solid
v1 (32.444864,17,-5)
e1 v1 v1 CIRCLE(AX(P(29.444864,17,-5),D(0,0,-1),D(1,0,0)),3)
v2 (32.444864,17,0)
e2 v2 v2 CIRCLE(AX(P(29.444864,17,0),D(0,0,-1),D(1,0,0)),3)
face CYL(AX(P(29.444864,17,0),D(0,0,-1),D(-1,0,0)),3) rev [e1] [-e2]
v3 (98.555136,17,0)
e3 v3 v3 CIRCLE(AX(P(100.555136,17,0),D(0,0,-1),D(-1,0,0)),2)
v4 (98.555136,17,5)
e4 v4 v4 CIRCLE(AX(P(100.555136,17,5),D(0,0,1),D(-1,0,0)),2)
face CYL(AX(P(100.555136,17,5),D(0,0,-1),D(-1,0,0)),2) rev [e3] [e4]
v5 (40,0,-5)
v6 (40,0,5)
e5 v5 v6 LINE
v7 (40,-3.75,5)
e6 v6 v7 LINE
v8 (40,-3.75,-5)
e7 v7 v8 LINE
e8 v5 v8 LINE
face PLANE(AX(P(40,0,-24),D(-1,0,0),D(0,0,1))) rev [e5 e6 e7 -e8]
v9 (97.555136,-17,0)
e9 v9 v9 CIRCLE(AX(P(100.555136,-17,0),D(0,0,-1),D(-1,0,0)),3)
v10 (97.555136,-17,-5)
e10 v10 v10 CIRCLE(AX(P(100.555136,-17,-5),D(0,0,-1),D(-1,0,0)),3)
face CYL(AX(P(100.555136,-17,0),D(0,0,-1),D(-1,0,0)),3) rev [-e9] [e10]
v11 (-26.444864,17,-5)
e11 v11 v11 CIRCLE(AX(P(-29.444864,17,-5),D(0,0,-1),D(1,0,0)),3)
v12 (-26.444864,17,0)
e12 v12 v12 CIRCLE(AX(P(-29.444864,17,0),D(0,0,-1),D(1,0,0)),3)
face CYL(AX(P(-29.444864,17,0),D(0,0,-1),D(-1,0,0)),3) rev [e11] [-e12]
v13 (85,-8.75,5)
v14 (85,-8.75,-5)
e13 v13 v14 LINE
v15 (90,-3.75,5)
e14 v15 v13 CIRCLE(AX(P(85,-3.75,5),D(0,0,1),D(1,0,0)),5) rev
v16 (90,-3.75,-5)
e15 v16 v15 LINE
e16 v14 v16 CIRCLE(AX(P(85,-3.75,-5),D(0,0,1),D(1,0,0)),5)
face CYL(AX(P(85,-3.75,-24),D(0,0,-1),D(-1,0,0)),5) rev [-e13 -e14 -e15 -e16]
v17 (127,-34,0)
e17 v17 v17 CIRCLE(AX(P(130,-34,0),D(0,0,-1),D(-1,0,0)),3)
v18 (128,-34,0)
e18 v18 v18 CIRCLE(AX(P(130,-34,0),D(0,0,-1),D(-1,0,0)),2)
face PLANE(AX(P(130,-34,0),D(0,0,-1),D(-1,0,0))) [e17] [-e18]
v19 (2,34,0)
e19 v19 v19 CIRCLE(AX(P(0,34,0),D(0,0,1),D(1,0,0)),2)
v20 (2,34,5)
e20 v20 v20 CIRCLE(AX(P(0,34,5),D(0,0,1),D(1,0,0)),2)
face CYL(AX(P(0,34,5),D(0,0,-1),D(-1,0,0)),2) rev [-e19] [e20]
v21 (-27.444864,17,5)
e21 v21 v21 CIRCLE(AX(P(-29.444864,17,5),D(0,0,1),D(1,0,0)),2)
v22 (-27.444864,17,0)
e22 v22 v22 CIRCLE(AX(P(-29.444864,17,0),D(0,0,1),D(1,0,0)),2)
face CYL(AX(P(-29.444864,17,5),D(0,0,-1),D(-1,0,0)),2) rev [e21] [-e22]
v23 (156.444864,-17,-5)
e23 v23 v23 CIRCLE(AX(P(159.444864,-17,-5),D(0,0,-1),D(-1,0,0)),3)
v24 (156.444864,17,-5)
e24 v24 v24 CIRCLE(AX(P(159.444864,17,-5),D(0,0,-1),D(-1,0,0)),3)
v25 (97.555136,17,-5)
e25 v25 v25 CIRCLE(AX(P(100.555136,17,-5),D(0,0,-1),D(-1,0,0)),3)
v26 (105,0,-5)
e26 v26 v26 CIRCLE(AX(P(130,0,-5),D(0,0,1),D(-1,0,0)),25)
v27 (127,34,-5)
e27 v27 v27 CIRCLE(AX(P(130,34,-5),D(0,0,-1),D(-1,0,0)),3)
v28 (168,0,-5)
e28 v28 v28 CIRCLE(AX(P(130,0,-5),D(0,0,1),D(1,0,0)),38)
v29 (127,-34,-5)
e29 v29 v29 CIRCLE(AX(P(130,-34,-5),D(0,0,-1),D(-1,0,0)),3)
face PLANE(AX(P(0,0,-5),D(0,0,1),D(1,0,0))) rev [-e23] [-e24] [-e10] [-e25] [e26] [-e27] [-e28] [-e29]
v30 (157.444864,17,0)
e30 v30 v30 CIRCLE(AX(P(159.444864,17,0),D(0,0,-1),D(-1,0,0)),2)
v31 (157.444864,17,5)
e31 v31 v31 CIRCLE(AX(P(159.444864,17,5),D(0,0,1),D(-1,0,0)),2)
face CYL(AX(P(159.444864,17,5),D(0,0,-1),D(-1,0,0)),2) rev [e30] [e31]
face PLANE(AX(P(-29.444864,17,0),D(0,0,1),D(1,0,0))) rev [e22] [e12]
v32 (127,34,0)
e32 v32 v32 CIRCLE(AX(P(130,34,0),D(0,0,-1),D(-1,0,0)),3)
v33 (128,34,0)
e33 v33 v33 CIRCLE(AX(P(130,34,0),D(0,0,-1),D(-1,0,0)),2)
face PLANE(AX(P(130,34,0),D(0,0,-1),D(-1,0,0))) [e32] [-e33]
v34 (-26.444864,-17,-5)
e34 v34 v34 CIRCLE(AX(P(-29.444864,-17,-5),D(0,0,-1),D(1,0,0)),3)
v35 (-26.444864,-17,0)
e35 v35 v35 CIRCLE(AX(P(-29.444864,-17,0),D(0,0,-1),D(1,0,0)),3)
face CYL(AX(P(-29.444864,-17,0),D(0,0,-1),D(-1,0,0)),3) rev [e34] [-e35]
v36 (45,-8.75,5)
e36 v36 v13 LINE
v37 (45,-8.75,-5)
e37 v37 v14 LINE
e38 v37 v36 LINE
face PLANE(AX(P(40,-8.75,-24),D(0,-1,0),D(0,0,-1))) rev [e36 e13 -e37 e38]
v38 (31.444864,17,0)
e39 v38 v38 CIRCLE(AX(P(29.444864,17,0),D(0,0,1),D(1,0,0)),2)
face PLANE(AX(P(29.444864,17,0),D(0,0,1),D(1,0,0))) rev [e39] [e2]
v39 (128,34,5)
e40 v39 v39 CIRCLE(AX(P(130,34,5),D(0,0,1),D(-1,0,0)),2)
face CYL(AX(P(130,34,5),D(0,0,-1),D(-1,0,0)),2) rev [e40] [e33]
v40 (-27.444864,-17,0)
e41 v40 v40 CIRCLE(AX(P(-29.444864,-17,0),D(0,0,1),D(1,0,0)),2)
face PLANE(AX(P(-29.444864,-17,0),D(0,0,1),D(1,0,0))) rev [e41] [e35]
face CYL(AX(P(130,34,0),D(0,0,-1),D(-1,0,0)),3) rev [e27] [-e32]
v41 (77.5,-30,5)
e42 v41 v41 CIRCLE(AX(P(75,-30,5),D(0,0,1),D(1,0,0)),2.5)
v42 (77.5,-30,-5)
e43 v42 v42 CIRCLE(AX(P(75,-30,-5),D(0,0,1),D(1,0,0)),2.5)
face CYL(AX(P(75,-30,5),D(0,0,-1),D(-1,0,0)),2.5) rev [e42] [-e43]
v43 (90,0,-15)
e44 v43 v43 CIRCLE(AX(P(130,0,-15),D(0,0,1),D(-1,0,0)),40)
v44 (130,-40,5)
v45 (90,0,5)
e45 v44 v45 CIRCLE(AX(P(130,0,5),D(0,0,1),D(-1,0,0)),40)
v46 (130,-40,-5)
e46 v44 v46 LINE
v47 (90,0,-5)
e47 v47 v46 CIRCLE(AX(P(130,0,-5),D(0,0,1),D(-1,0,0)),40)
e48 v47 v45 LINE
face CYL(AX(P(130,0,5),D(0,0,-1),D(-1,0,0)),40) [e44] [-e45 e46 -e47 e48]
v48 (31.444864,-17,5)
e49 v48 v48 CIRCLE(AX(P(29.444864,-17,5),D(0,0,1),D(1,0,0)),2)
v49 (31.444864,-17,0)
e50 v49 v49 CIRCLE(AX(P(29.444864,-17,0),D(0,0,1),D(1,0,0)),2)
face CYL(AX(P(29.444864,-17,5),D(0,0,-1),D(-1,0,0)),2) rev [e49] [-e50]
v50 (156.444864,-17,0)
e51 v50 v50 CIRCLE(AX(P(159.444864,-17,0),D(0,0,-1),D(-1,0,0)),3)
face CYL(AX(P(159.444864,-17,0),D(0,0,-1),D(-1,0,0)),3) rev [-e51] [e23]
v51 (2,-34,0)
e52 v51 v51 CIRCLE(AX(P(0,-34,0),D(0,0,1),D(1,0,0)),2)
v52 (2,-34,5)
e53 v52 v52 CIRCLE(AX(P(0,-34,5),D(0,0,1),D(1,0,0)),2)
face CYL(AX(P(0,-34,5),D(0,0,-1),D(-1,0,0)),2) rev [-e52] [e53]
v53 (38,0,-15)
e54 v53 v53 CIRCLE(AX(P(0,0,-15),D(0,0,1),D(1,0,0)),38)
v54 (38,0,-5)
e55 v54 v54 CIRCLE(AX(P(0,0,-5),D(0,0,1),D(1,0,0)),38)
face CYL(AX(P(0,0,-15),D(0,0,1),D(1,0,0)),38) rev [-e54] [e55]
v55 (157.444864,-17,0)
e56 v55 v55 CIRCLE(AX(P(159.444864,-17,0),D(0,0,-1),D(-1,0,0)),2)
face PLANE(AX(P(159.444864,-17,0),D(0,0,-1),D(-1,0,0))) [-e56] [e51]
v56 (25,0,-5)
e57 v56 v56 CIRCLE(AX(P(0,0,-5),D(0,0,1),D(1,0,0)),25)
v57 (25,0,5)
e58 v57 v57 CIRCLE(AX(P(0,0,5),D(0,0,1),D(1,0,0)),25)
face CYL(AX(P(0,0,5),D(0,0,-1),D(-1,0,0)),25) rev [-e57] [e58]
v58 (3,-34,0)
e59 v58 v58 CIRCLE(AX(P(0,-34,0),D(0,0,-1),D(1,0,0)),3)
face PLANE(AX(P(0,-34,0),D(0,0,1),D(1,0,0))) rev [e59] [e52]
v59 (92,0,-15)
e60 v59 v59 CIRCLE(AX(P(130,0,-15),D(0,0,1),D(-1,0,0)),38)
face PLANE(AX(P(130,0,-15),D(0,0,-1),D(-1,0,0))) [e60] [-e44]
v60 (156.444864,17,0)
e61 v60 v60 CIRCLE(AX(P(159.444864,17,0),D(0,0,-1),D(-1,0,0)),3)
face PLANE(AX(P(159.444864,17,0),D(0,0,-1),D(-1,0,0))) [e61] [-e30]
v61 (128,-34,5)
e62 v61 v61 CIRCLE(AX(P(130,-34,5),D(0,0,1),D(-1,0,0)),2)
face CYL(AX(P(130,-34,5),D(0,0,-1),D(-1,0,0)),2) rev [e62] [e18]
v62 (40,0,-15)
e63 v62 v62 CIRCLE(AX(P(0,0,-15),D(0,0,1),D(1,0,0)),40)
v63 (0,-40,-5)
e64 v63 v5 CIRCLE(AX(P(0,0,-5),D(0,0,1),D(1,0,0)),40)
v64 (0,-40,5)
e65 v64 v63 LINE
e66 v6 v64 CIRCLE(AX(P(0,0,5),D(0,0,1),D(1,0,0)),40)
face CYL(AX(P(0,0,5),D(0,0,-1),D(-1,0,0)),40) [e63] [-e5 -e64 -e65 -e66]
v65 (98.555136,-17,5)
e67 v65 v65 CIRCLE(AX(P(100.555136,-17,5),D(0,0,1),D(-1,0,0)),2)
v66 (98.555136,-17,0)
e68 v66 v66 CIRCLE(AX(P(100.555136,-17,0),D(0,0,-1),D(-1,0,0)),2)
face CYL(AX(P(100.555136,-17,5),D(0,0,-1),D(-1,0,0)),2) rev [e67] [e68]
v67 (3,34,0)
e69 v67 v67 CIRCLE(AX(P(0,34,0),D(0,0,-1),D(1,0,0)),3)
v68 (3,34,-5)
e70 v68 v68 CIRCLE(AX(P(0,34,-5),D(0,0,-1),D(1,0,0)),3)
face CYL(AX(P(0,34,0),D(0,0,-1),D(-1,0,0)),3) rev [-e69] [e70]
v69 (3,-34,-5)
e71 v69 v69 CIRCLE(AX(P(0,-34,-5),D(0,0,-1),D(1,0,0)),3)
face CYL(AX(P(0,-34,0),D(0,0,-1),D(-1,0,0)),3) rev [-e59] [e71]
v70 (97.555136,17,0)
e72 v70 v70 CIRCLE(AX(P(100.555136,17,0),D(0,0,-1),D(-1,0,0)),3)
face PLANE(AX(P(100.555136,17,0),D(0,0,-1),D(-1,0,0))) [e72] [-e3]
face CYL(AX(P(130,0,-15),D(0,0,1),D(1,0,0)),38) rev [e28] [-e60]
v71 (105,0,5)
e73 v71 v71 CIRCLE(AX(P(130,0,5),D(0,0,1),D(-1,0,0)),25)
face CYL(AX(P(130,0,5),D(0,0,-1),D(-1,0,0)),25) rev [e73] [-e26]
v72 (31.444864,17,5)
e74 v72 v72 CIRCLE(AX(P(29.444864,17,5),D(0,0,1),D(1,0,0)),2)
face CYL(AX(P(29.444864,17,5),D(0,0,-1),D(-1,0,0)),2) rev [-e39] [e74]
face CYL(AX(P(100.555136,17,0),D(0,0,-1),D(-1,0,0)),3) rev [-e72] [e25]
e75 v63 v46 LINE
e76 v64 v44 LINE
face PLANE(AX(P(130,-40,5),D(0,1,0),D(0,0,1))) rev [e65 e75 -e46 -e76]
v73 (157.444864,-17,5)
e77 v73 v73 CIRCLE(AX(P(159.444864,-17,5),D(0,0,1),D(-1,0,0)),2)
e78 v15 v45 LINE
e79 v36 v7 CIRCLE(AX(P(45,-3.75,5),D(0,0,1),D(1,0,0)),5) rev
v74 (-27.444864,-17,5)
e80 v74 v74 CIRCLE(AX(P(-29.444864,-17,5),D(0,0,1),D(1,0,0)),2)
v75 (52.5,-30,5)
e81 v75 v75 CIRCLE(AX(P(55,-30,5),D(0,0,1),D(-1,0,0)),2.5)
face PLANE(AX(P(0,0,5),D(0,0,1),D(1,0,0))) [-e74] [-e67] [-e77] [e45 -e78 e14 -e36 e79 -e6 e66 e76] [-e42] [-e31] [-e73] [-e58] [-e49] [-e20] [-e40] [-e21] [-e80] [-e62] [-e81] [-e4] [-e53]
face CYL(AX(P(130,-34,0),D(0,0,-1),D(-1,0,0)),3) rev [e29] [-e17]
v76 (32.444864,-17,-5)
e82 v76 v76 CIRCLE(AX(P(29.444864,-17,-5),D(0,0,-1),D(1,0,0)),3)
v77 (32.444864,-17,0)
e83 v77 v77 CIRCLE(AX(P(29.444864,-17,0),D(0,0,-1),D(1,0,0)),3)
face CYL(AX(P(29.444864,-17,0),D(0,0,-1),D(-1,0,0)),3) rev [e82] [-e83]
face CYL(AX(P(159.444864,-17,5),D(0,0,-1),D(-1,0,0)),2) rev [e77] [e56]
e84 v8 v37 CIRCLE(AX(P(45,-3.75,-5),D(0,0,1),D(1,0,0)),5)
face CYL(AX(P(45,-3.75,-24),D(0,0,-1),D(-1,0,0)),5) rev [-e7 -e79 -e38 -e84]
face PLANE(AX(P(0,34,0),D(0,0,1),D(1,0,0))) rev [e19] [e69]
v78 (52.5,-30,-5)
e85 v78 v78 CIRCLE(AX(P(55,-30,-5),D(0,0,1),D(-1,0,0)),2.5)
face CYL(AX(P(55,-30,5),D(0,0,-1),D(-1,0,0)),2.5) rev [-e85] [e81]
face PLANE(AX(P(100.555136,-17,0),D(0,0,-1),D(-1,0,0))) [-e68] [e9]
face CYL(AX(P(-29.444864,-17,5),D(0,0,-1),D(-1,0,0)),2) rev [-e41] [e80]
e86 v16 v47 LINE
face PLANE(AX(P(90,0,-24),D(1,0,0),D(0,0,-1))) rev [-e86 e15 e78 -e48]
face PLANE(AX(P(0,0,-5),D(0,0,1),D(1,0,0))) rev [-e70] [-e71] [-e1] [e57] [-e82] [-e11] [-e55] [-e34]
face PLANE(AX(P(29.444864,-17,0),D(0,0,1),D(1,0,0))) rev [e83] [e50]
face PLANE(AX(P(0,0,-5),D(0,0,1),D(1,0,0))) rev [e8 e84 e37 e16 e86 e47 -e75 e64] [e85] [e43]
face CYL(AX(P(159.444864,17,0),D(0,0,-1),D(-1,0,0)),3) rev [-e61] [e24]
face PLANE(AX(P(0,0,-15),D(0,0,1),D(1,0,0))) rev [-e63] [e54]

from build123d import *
from build123d.topology import SkipClean

# Parameters (mm, degrees)
SKETCH1_R           = 2
SKETCH1_R_2         = 2.5
BOSS_EXTRUDE1_DEPTH = 5
SKETCH2_R           = 3
CUT_EXTRUDE2_DEPTH  = 5
SKETCH6_R           = 40
SKETCH6_R_2         = 38
BOSS_EXTRUDE2_DEPTH = 10
CUT_EXTRUDE3_DEPTH  = 29
FILLET1_R           = 5


with BuildPart() as part:
    # Sketch1 → Boss-Extrude1 (new, symmetric)
    with SkipClean():  # the faces are left unmerged after this step: merging them gives an invalid solid
        with BuildSketch(Plane.XY):
            with BuildLine():
                Line((0, 40), (130, 40))
                ThreePointArc((130, 40), (170, 0), (130, -40))
                Line((130, -40), (0, -40))
                ThreePointArc((0, -40), (-40, 0), (0, 40))
            make_face()
            with Locations((0, 34)):
                Circle(SKETCH1_R, mode=Mode.SUBTRACT)
            with Locations((29.444863729, 17)):
                Circle(SKETCH1_R, mode=Mode.SUBTRACT)
            with Locations((29.444863729, -17)):
                Circle(SKETCH1_R, mode=Mode.SUBTRACT)
            with Locations((0, -34)):
                Circle(SKETCH1_R, mode=Mode.SUBTRACT)
            with Locations((-29.444863729, -17)):
                Circle(SKETCH1_R, mode=Mode.SUBTRACT)
            with Locations((-29.444863729, 17)):
                Circle(SKETCH1_R, mode=Mode.SUBTRACT)
            with Locations(Location((130, -34, 0), (0, 0, 180))):
                Circle(SKETCH1_R, mode=Mode.SUBTRACT)
            with Locations(Location((159.444863729, 17, 0), (0, 0, 180))):
                Circle(SKETCH1_R, mode=Mode.SUBTRACT)
            with Locations(Location((159.444863729, -17, 0), (0, 0, 180))):
                Circle(SKETCH1_R, mode=Mode.SUBTRACT)
            with Locations(Location((100.555136271, -17, 0), (0, 0, 180))):
                Circle(SKETCH1_R, mode=Mode.SUBTRACT)
            with Locations(Location((100.555136271, 17, 0), (0, 0, 180))):
                Circle(SKETCH1_R, mode=Mode.SUBTRACT)
            with Locations(Location((130, 34, 0), (0, 0, 180))):
                Circle(SKETCH1_R, mode=Mode.SUBTRACT)
            with Locations((55, 30)):
                Circle(SKETCH1_R_2, mode=Mode.SUBTRACT)
            with Locations(Location((75, 30, 0), (0, 0, 180))):
                Circle(SKETCH1_R_2, mode=Mode.SUBTRACT)
            with Locations((75, -30)):
                Circle(SKETCH1_R_2, mode=Mode.SUBTRACT)
            with Locations(Location((55, -30, 0), (0, 0, 180))):
                Circle(SKETCH1_R_2, mode=Mode.SUBTRACT)
            with BuildLine():
                ThreePointArc((25, 0), (0, 25), (-25, 0))
                ThreePointArc((-25, 0), (0, -25), (25, 0))
            make_face(mode=Mode.SUBTRACT)
            with BuildLine():
                ThreePointArc((155, 0), (130, -25), (105, 0))
                ThreePointArc((105, 0), (130, 25), (155, 0))
            make_face(mode=Mode.SUBTRACT)
        extrude(amount=BOSS_EXTRUDE1_DEPTH, both=True)
    add(part.part.scale(1), mode=Mode.REPLACE)  # the faces are merged on a copy

    # Sketch2 → Cut-Extrude2 (cut)
    with BuildSketch(Plane(origin=(0, 0, -5), x_dir=(-1, 0, 0), z_dir=(0, 0, -1))):
        with Locations((-130, 34)):
            Circle(SKETCH2_R)
        with Locations((-100.555136271, 17)):
            Circle(SKETCH2_R)
        with Locations((-100.555136271, -17)):
            Circle(SKETCH2_R)
        with Locations((-130, -34)):
            Circle(SKETCH2_R)
        with Locations((-159.444863729, -17)):
            Circle(SKETCH2_R)
        with Locations((-159.444863729, 17)):
            Circle(SKETCH2_R)
        with Locations(Location((29.444863729, 17, 0), (0, 0, 180))):
            Circle(SKETCH2_R)
        with Locations(Location((29.444863729, -17, 0), (0, 0, 180))):
            Circle(SKETCH2_R)
        with Locations(Location((0, -34, 0), (0, 0, 180))):
            Circle(SKETCH2_R)
        with Locations(Location((-29.444863729, -17, 0), (0, 0, 180))):
            Circle(SKETCH2_R)
        with Locations(Location((-29.444863729, 17, 0), (0, 0, 180))):
            Circle(SKETCH2_R)
        with Locations(Location((0, 34, 0), (0, 0, 180))):
            Circle(SKETCH2_R)
    extrude(amount=-CUT_EXTRUDE2_DEPTH, mode=Mode.SUBTRACT)

    # Sketch6 → Boss-Extrude2 (add)
    # profile 1 of 2: a face of its own
    with SkipClean():  # the faces are left unmerged after this step: merging them gives an invalid solid
        with BuildSketch(Plane.XY.offset(-5)):
            with Locations(Location((0, 0, 0), (0, 0, 90))):
                Circle(SKETCH6_R)
            Circle(SKETCH6_R_2, mode=Mode.SUBTRACT)
        # profile 2 of 2: a face of its own
        with BuildSketch(Plane.XY.offset(-5)):
            with Locations(Location((130, 0, 0), (0, 0, 180))):
                Circle(SKETCH6_R)
            with Locations((130, 0)):
                Circle(SKETCH6_R_2, mode=Mode.SUBTRACT)
        extrude(amount=-BOSS_EXTRUDE2_DEPTH)
    add(part.part.scale(1), mode=Mode.REPLACE)  # the faces are merged on a copy

    # Sketch7 → Cut-Extrude3 (cut)
    with SkipClean():  # the faces are left unmerged after this step: merging them gives an invalid solid
        with BuildSketch(Plane.XY.offset(5)):
            with BuildLine():
                Line((0, 52.799950915), (130, 52.799950915))
                Line((130, 52.799950915), (130, 40))
                ThreePointArc((130, 40), (101.715728753, 28.284271247), (90, 0))
                Line((90, 0), (90, -8.75))
                Line((90, -8.75), (40, -8.75))
                Line((40, -8.75), (40, 0))
                ThreePointArc((40, 0), (28.284271247, 28.284271247), (0, 40))
                Line((0, 40), (0, 52.799950915))
            make_face()
        extrude(amount=-CUT_EXTRUDE3_DEPTH, mode=Mode.SUBTRACT)

    # Fillet1
    fillet1_edges = [part.edges().sort_by_distance(p)[0] for p in [
        (90, -8.75, 0),
        (40, -8.75, 0),
    ]]
    fillet(fillet1_edges, radius=FILLET1_R)


solid = part.part
